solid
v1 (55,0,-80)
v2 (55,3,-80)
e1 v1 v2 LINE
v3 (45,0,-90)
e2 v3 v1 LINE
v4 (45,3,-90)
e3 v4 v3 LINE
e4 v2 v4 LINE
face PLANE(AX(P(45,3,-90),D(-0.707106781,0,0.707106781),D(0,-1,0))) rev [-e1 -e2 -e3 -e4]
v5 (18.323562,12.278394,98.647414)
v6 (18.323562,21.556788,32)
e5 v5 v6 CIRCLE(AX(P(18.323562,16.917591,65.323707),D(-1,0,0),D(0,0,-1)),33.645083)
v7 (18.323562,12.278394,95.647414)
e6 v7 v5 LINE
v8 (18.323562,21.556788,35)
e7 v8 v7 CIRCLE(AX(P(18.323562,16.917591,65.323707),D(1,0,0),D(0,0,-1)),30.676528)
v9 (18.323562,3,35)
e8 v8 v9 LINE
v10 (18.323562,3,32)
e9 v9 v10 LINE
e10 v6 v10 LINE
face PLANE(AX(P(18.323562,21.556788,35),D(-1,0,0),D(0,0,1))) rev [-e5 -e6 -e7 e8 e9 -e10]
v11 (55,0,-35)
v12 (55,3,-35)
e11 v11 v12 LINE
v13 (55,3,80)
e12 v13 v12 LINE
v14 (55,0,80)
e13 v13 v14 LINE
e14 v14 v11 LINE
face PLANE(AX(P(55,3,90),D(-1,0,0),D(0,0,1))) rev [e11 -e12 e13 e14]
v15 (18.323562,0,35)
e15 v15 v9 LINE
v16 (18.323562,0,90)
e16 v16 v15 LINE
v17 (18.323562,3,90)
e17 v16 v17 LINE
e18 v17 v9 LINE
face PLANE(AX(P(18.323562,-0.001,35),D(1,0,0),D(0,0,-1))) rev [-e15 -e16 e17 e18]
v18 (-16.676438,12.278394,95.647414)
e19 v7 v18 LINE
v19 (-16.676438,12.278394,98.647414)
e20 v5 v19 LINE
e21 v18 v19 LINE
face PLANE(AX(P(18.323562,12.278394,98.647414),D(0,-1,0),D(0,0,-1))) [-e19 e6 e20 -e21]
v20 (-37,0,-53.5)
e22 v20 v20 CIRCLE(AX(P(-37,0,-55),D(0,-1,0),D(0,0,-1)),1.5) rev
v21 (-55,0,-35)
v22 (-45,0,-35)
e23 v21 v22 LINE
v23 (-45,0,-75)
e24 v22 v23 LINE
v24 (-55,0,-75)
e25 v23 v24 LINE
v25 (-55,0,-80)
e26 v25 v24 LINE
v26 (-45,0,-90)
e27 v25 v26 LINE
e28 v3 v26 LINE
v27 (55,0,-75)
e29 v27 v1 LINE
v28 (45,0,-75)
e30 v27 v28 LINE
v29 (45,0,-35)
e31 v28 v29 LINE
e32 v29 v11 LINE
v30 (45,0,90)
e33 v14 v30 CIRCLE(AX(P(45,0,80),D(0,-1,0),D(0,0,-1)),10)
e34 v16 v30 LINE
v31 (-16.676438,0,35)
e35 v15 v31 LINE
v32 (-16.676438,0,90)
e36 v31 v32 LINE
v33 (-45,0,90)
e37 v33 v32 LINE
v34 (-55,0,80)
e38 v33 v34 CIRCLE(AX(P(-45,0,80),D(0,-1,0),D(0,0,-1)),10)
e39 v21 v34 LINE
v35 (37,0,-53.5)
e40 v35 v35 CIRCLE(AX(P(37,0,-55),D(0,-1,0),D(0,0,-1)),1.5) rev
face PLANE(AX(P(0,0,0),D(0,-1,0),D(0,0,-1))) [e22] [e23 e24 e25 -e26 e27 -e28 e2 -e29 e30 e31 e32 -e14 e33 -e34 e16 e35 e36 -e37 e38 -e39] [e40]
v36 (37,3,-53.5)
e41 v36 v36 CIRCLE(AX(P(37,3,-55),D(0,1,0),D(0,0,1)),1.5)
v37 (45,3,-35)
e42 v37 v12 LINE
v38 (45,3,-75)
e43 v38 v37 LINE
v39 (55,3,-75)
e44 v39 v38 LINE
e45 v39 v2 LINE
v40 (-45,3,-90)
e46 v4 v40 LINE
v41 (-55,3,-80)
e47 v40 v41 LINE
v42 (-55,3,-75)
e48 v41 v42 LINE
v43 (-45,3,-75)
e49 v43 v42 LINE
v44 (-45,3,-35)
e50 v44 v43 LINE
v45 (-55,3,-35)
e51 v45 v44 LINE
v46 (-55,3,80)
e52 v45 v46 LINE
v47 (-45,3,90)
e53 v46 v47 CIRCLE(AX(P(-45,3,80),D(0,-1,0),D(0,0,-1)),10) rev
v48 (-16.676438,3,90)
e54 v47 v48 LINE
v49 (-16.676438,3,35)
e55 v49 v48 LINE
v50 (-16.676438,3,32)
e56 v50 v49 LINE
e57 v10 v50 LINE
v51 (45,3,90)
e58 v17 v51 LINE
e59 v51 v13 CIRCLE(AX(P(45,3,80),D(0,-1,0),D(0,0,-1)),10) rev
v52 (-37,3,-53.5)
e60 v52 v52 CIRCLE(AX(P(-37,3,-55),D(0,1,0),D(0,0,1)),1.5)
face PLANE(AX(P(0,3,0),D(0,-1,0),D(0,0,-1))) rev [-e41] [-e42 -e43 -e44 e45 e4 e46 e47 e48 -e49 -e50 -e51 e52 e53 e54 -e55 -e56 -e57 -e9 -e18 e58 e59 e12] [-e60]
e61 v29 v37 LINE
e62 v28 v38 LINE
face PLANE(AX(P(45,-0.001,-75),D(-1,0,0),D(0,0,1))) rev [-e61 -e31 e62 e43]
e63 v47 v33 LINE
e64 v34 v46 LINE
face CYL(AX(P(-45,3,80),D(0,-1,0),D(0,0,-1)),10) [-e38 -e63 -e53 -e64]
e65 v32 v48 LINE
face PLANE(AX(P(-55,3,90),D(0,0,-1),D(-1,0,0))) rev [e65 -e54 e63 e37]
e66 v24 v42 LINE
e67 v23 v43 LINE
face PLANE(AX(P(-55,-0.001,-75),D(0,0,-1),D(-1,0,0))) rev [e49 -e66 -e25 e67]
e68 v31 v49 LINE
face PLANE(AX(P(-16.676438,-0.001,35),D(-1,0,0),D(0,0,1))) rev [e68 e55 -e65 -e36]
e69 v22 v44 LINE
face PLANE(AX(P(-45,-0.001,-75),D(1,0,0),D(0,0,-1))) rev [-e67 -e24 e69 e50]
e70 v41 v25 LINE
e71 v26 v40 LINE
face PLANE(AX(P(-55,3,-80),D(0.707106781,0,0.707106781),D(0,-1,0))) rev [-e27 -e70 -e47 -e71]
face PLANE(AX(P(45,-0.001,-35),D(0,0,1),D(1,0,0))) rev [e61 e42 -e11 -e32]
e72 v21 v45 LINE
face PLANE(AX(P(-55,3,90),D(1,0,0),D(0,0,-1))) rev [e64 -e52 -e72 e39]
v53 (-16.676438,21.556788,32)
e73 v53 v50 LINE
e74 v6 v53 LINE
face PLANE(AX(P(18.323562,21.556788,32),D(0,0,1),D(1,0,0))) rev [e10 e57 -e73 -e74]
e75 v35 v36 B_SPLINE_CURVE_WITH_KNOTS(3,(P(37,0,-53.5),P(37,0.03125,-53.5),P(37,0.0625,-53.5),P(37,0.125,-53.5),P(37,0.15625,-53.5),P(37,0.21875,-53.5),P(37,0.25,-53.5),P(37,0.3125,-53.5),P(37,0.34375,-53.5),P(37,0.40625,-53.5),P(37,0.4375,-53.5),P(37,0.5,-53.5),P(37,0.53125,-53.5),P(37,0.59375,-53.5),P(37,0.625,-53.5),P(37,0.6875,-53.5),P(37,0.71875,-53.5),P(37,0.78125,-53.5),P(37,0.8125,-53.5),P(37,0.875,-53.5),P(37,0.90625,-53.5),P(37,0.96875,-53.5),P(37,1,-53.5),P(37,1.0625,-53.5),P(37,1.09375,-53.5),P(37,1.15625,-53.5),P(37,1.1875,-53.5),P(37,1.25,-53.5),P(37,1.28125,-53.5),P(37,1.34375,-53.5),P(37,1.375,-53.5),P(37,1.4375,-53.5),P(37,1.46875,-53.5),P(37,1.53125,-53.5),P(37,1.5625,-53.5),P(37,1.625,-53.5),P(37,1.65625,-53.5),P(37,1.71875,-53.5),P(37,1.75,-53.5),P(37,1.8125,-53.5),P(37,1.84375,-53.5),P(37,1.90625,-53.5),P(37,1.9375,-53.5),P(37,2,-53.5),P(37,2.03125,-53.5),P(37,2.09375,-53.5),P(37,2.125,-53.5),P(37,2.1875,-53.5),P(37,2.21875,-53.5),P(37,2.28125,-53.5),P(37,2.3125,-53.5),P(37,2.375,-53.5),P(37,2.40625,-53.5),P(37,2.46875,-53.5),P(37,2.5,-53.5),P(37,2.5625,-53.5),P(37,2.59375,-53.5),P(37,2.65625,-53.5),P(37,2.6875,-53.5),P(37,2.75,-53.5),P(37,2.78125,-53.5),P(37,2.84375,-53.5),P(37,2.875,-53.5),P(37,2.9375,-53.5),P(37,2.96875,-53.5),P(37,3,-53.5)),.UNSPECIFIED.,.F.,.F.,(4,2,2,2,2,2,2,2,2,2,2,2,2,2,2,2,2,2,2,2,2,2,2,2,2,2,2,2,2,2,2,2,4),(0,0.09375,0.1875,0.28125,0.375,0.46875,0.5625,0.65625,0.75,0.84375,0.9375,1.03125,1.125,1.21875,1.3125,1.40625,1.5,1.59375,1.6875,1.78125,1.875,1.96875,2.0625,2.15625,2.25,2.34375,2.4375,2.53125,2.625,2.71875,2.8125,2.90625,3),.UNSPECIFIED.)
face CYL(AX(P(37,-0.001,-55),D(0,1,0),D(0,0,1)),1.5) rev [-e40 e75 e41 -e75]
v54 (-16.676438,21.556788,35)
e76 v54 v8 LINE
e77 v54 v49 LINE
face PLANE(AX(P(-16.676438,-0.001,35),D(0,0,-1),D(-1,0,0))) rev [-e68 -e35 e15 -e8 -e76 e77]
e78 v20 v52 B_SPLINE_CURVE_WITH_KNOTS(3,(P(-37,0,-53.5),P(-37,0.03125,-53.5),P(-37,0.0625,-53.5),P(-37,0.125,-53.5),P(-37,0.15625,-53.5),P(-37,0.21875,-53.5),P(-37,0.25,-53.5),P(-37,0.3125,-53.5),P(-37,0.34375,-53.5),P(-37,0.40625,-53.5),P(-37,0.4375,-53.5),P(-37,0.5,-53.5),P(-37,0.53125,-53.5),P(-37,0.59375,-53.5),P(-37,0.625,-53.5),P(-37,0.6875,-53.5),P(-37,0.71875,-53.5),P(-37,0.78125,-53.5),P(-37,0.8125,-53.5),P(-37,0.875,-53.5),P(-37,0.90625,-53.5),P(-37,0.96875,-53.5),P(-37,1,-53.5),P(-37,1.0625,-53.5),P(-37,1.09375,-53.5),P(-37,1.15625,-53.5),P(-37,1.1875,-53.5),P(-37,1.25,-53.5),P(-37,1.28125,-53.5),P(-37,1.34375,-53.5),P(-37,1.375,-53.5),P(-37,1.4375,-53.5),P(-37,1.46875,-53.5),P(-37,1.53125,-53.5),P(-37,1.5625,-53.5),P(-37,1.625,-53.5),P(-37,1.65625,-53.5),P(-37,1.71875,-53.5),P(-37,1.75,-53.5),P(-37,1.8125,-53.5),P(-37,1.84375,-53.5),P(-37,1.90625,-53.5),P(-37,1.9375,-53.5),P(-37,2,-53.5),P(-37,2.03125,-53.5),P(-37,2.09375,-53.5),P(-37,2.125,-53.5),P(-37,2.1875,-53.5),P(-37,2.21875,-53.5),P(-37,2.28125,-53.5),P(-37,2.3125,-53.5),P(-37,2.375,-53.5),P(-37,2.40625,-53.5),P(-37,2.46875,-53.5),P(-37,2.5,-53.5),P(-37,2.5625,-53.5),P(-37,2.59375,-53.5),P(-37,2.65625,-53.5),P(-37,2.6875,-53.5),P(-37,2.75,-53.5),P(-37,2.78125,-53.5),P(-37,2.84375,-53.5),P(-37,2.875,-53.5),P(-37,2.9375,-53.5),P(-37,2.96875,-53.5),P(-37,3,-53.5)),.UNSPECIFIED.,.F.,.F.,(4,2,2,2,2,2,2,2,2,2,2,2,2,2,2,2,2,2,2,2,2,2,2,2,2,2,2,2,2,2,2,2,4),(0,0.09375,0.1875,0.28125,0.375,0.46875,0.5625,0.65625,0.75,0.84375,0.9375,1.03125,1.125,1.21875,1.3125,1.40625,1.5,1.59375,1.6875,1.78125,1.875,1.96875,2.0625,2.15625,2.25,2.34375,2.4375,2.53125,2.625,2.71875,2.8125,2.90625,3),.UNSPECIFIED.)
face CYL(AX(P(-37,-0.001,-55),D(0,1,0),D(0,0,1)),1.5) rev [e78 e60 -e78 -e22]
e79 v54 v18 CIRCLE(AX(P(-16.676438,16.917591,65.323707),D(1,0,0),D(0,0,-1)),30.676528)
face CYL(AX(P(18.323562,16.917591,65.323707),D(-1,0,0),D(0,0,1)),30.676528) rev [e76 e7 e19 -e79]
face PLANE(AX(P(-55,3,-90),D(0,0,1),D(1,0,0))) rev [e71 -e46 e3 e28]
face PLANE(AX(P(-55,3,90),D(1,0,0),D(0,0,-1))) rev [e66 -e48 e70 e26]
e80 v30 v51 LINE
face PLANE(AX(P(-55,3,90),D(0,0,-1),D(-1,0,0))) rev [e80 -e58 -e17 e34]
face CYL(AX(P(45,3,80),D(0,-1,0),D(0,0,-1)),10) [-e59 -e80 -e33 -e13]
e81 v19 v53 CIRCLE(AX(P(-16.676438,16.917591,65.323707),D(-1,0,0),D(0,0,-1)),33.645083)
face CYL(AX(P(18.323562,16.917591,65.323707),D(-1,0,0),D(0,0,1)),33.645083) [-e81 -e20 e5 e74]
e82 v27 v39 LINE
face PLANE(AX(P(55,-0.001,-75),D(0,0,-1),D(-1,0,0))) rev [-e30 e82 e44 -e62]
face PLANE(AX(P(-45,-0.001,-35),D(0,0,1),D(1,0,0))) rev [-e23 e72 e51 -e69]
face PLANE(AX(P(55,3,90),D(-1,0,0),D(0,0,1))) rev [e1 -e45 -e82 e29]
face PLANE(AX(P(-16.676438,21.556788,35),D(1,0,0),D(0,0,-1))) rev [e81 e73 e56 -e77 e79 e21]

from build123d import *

# Parameters (mm, degrees)
SKETCH3_W           = 110
SKETCH3_H           = 180
BOSS_EXTRUDE1_DEPTH = 3
CUT_EXTRUDE1_REACH  = 107.518
SKETCH4_W           = 35
SKETCH4_H           = 55
CUT_EXTRUDE2_REACH  = 107.518
SKETCH5_R           = 1.5
FILLET1_R           = 10
FILLET2_R           = 10
SKETCH9_W           = 35
SKETCH9_H           = 3
BOSS_EXTRUDE2_DEPTH = 18.556788
BOSS_EXTRUDE3_START = -16.676438017
BOSS_EXTRUDE3_DEPTH = 35
CUT_EXTRUDE3_REACH  = 124.809
SKETCH16_W          = 10
SKETCH16_H          = 40
CHAMFER1_SIZE       = 10


# Read off the part's stored shape, not the designer's step: Boss-Extrude3
with BuildPart() as part:
    # Sketch3 → Boss-Extrude1 (new body)
    with BuildSketch(Plane(origin=(0, 0, 0), x_dir=(1, 0, 0), z_dir=(0, 1, 0))):
        Rectangle(SKETCH3_W, SKETCH3_H)
    extrude(amount=BOSS_EXTRUDE1_DEPTH)

    # Sketch4 → Cut-Extrude1 (cut, up to next)
    with BuildSketch(Plane(origin=(0, 3, 0), x_dir=(1, 0, 0), z_dir=(0, 1, 0)), mode=Mode.PRIVATE) as cut_extrude1_sk1:
        with Locations((0.823561983, -62.5)):
            Rectangle(SKETCH4_W, SKETCH4_H)
    cut_extrude1_tool1 = extrude(cut_extrude1_sk1.sketch, amount=-CUT_EXTRUDE1_REACH, mode=Mode.PRIVATE) & part.part
    add(cut_extrude1_tool1.solids().sort_by_distance((0.823562, 3, 62.5))[0], mode=Mode.SUBTRACT)

    # Sketch5 → Cut-Extrude2 (cut, up to next)
    with BuildSketch(Plane(origin=(0, 3, 0), x_dir=(1, 0, 0), z_dir=(0, 1, 0)), mode=Mode.PRIVATE) as cut_extrude2_sk1:
        with Locations(Location((37, 55, 0), (0, 0, 270))):
            Circle(SKETCH5_R)
    cut_extrude2_tool1 = extrude(cut_extrude2_sk1.sketch, amount=-CUT_EXTRUDE2_REACH, mode=Mode.PRIVATE) & part.part
    # Sketch5 → Cut-Extrude2 (cut, up to next)
    with BuildSketch(Plane(origin=(0, 3, 0), x_dir=(1, 0, 0), z_dir=(0, 1, 0)), mode=Mode.PRIVATE) as cut_extrude2_sk2:
        with Locations(Location((-37, 55, 0), (0, 0, 270))):
            Circle(SKETCH5_R)
    cut_extrude2_tool2 = extrude(cut_extrude2_sk2.sketch, amount=-CUT_EXTRUDE2_REACH, mode=Mode.PRIVATE) & part.part
    add(cut_extrude2_tool1.solids().sort_by_distance((37, 3, -55))[0], mode=Mode.SUBTRACT)
    add(cut_extrude2_tool2.solids().sort_by_distance((-37, 3, -55))[0], mode=Mode.SUBTRACT)

    # Fillet1
    fillet1_edges = [part.edges().sort_by_distance(p)[0] for p in [
        (-55, 1.5, 90),
    ]]
    fillet(fillet1_edges, radius=FILLET1_R)

    # Fillet2
    fillet2_edges = [part.edges().sort_by_distance(p)[0] for p in [
        (55, 1.5, 90),
    ]]
    fillet(fillet2_edges, radius=FILLET2_R)

    # Sketch9 → Boss-Extrude2 (add)
    with BuildSketch(Plane(origin=(0, 3, 0), x_dir=(1, 0, 0), z_dir=(0, 1, 0))):
        with Locations((0.823561983, -33.5)):
            Rectangle(SKETCH9_W, SKETCH9_H)
    extrude(amount=BOSS_EXTRUDE2_DEPTH)

    # Boss-Extrude3 outline → Boss-Extrude3 (add)
    with BuildSketch(Plane.YZ.offset(BOSS_EXTRUDE3_START)):
        with BuildLine():
            ThreePointArc((21.556787547, 32), (50.241297741, 69.962903968), (12.278393773, 98.647414162))
            Line((12.278393773, 98.647414162), (12.278393773, 95.647414162))
            ThreePointArc((12.278393773, 95.647414162), (47.241297741, 69.962903968), (21.556787547, 35))
            Line((21.556787547, 35), (21.556787547, 32))
        make_face()
    extrude(amount=BOSS_EXTRUDE3_DEPTH)

    # Sketch16 → Cut-Extrude3 (cut, up to next)
    with BuildSketch(Plane(origin=(0, 3, 0), x_dir=(1, 0, 0), z_dir=(0, 1, 0)), mode=Mode.PRIVATE) as cut_extrude3_sk1:
        with Locations((50, 55)):
            Rectangle(SKETCH16_W, SKETCH16_H)
    cut_extrude3_tool1 = extrude(cut_extrude3_sk1.sketch, amount=-CUT_EXTRUDE3_REACH, mode=Mode.PRIVATE) & part.part
    # Sketch16 → Cut-Extrude3 (cut, up to next)
    with BuildSketch(Plane(origin=(0, 3, 0), x_dir=(1, 0, 0), z_dir=(0, 1, 0)), mode=Mode.PRIVATE) as cut_extrude3_sk2:
        with Locations((-50, 55)):
            Rectangle(SKETCH16_W, SKETCH16_H)
    cut_extrude3_tool2 = extrude(cut_extrude3_sk2.sketch, amount=-CUT_EXTRUDE3_REACH, mode=Mode.PRIVATE) & part.part
    add(cut_extrude3_tool1.solids().sort_by_distance((50, 3, -55))[0], mode=Mode.SUBTRACT)
    add(cut_extrude3_tool2.solids().sort_by_distance((-50, 3, -55))[0], mode=Mode.SUBTRACT)

    # Chamfer1
    chamfer1_edges = [part.edges().sort_by_distance(p)[0] for p in [
        (-55, 1.5, -90),
        (55, 1.5, -90),
    ]]
    chamfer(chamfer1_edges, length=CHAMFER1_SIZE)


solid = part.part
